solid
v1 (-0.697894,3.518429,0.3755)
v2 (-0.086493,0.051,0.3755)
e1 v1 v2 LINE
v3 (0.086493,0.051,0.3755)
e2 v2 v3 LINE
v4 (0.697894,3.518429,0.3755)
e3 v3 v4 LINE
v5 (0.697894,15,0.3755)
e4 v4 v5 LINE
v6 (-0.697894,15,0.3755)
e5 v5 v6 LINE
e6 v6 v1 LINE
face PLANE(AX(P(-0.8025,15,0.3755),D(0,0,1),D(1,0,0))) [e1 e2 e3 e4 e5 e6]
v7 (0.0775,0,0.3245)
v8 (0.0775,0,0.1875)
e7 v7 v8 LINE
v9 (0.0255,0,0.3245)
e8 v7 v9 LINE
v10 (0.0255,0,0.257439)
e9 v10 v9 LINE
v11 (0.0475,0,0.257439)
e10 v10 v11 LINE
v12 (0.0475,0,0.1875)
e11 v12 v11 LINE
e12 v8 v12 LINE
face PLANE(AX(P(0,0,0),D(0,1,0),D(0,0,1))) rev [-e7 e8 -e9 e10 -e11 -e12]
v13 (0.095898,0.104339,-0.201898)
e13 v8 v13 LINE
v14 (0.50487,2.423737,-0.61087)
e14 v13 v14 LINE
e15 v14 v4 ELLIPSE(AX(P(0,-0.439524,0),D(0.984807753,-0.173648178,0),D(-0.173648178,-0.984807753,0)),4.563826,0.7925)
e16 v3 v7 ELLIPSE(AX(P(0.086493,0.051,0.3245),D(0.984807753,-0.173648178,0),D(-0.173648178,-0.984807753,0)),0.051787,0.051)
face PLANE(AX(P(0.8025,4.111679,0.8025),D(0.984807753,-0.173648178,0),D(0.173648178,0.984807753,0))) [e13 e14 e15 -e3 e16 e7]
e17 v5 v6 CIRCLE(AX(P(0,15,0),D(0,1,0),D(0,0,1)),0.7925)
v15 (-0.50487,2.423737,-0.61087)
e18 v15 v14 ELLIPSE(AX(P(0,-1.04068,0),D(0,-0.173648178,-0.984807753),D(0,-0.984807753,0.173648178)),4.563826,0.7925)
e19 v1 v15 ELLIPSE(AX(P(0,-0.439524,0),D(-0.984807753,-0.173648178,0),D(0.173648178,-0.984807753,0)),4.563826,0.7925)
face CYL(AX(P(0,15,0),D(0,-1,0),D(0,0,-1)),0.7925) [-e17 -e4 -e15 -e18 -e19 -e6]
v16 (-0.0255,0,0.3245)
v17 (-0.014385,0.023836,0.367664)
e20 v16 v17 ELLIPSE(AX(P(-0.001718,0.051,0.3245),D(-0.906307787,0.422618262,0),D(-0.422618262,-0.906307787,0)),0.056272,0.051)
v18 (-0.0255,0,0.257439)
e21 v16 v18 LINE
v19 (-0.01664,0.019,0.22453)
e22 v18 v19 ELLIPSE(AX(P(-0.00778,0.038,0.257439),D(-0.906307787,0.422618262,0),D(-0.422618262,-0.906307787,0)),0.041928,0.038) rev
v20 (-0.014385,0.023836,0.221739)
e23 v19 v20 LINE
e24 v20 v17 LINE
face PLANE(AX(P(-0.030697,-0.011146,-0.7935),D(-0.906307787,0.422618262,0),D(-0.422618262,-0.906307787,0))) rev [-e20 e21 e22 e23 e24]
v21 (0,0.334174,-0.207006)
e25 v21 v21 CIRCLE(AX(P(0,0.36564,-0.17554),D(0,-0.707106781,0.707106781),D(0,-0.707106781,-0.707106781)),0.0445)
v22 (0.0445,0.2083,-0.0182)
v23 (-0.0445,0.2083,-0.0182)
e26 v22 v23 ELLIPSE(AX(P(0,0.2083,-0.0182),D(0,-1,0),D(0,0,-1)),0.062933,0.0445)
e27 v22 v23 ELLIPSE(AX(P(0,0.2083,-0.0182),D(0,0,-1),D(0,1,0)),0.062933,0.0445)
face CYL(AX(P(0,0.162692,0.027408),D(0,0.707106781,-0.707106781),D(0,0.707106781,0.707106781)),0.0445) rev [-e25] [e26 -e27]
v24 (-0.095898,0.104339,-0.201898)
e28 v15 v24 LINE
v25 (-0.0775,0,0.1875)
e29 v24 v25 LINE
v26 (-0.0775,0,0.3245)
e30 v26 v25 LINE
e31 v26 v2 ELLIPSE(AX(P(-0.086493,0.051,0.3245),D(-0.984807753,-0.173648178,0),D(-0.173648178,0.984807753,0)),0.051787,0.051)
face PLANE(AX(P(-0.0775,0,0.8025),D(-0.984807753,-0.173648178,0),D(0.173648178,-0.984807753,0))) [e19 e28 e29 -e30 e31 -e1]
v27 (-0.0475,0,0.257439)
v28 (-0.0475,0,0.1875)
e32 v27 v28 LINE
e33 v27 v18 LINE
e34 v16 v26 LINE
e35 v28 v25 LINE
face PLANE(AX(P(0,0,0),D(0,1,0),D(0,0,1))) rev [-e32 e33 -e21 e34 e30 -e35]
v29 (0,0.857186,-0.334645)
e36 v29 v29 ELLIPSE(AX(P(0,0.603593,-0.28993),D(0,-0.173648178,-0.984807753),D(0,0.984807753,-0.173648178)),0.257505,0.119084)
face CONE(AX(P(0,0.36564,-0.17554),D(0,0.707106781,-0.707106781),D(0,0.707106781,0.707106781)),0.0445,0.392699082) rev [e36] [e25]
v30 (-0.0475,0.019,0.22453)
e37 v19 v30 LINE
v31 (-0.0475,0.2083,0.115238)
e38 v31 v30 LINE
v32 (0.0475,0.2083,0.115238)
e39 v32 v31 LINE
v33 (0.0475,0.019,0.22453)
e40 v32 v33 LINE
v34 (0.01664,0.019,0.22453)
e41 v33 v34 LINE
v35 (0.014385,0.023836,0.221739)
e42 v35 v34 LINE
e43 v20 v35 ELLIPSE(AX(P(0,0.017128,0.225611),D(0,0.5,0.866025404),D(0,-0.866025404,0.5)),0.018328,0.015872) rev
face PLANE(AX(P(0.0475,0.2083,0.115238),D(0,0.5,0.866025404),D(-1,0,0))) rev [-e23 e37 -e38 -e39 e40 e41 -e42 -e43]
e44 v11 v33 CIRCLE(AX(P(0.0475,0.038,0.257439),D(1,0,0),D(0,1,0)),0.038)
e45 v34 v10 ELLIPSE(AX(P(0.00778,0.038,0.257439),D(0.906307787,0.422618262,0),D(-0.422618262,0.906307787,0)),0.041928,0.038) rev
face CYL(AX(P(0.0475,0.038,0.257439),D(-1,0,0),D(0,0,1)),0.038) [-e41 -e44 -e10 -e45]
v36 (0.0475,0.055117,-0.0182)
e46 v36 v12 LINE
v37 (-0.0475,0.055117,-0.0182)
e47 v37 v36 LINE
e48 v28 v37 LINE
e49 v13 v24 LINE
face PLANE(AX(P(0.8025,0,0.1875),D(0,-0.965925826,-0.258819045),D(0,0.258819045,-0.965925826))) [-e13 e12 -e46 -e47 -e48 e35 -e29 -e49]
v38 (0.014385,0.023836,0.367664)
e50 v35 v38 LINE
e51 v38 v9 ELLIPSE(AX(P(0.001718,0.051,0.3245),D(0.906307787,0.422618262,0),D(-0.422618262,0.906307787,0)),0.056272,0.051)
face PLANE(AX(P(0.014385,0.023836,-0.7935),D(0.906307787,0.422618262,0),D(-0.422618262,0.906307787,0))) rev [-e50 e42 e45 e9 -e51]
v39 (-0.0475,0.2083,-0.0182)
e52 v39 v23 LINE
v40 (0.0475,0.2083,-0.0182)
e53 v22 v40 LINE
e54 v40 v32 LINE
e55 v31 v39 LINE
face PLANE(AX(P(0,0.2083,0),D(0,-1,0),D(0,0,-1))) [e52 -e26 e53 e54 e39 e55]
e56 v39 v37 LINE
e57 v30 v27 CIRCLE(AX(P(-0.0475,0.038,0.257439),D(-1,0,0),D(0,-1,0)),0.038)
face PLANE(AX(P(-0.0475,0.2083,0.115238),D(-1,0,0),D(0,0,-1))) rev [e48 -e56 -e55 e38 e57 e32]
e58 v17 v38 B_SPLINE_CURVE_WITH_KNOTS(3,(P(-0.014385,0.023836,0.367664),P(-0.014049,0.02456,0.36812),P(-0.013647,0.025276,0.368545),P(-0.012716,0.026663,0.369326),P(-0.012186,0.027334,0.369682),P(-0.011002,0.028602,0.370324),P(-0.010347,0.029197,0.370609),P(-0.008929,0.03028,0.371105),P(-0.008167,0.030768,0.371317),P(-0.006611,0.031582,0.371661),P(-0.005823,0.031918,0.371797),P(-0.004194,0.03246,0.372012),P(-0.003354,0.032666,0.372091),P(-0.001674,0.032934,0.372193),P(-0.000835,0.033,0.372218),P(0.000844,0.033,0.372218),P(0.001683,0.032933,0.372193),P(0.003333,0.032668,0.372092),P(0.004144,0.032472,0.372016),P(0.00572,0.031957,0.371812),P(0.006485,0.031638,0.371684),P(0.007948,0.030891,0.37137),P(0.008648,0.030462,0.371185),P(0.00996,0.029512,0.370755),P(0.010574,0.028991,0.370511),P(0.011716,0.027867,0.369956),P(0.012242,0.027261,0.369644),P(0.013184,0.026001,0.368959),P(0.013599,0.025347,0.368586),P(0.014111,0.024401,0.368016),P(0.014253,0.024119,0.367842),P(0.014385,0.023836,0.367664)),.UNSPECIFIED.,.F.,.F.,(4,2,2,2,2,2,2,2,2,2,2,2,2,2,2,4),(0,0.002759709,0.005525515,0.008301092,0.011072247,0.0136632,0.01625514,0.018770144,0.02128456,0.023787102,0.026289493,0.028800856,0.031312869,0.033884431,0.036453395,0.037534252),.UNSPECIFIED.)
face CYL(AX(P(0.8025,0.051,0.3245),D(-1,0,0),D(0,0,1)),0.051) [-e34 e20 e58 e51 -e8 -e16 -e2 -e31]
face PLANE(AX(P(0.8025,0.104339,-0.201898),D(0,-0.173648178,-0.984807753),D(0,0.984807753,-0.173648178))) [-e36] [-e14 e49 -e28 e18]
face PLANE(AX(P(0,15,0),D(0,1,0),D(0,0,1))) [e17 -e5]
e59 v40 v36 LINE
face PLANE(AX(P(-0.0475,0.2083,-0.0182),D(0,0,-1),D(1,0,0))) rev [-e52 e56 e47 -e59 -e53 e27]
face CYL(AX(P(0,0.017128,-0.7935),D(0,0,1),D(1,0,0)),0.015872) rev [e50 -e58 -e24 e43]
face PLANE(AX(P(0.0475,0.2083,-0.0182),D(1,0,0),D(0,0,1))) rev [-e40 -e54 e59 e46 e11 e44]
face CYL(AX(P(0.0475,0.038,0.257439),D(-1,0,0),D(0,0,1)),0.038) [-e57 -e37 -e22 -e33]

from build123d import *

# Parameters (mm, degrees)
SKETCH_TL_CUTTING_R        = 0.7925
TL_CUTTING_DEPTH           = 15
SKETCH_TDF_GRINDING_W      = 1.605
SKETCH_TDF_GRINDING_H      = 1.605
TDF_GRINDING_DEPTH         = 16.041812141
ISA_GRINDING_DEPTH         = 0.8025
ISA_GRINDING_DEPTH_BACK    = 0.8025
BA_RA_GRINDING_DEPTH       = 0.8025
BA_RA_GRINDING_DEPTH_BACK  = 0.8025
FRO_ERODING_DEPTH          = 0.8025
FRO_ERODING_DEPTH_BACK     = 0.8025
CAVITY_ERODING_START       = -0.0475
CAVITY_ERODING_DEPTH       = 0.095
SKETCH_HOLE_CAVITY_ENTRY_R = 0.0445
SKETCH_END_CONST_SECTION_R = 0.0445
HOLE_START_FUNNEL_R        = 0.0445
SKETCH_END_FUNNEL_R        = 1.080033906
CUT_EXTRUDE1_REACH         = 17.066
FILLET1_R                  = 0.038


# Read off the part's stored shape, not the designer's step: cavity_eroding
with BuildPart() as part:
    # sketch_TL_cutting → TL_cutting (new body)
    with BuildSketch(Plane(origin=(0, 0, 0), x_dir=(1, 0, 0), z_dir=(0, 1, 0))):
        with Locations(Location((0, 0, 0), (0, 0, 270))):
            Circle(SKETCH_TL_CUTTING_R)
    extrude(amount=TL_CUTTING_DEPTH)

    # sketch_TDF_grinding → TDF_grinding (cut, through all)
    with BuildSketch(Plane(origin=(0, 0, 0), x_dir=(1, 0, 0), z_dir=(0, 1, 0))):
        with Locations((0, -1.178)):
            Rectangle(SKETCH_TDF_GRINDING_W, SKETCH_TDF_GRINDING_H)
    extrude(amount=TDF_GRINDING_DEPTH, mode=Mode.SUBTRACT)

    # sketch_ISA_grinding → ISA_grinding (cut, two sides: drawn at the far end of the back side and taken through both)
    with BuildSketch(Plane.XY.offset(-ISA_GRINDING_DEPTH_BACK)):
        Polygon((-0.0775, 0), (-0.8025, 4.111679319), (-0.8025, -0.01), (0.8025, -0.01), (0.8025, 4.111679319), (0.0775, 0), align=None)
    extrude(amount=ISA_GRINDING_DEPTH + ISA_GRINDING_DEPTH_BACK, mode=Mode.SUBTRACT)

    # sketch_BA_RA_grinding → BA_RA_grinding (cut, two sides: drawn at the far end of the back side and taken through both)
    with BuildSketch(Plane(origin=(0, 0, 0), x_dir=(0, 0, -1), z_dir=(1, 0, 0)).offset(-BA_RA_GRINDING_DEPTH_BACK)):
        Polygon((-0.1875, 0), (-0.3755, 0), (-0.3755, -0.01), (4.01816798, -0.01), (4.01816798, 15.01), (2.83016798, 15.01), (0.201897748, 0.104338812), align=None)
    extrude(amount=BA_RA_GRINDING_DEPTH + BA_RA_GRINDING_DEPTH_BACK, mode=Mode.SUBTRACT)

    # sketch_FRO_eroding → FRO_eroding (cut, two sides: drawn at the far end of the back side and taken through both)
    with BuildSketch(Plane(origin=(0, 0, 0), x_dir=(0, 0, -1), z_dir=(1, 0, 0)).offset(-FRO_ERODING_DEPTH_BACK)):
        with BuildLine():
            Line((-0.3755, 0.051), (-0.3855, 0.051))
            Line((-0.3855, 0.051), (-0.3855, -0.01))
            Line((-0.3855, -0.01), (-0.3245, -0.01))
            Line((-0.3245, -0.01), (-0.3245, 0))
            ThreePointArc((-0.3245, 0), (-0.360562446, 0.014937554), (-0.3755, 0.051))
        make_face()
    extrude(amount=FRO_ERODING_DEPTH + FRO_ERODING_DEPTH_BACK, mode=Mode.SUBTRACT)

    # cavity_eroding outline → cavity_eroding (cut)
    with BuildSketch(Plane.YZ.offset(CAVITY_ERODING_START)):
        Polygon((0, 0.1875), (0.055117149, -0.0182), (0.2083, -0.0182), (0.2083, 0.115237939), (0, 0.2355), align=None)
    extrude(amount=CAVITY_ERODING_DEPTH, mode=Mode.SUBTRACT)

    # sketch_hole_cavity_entry → hole_const_section section 0
    with BuildSketch(Plane(origin=(0, 0.162691609, 0.027408387), x_dir=(-1, 0, 0), z_dir=(0, -0.7071067811865479, 0.7071067811865472))):
        Circle(SKETCH_HOLE_CAVITY_ENTRY_R)
    # sketch_end_const_section → hole_const_section section 1
    with BuildSketch(Plane(origin=(0, 0.365639833, -0.175539837), x_dir=(-1, 0, 0), z_dir=(0, -0.7071067811865479, 0.7071067811865472))):
        Circle(SKETCH_END_CONST_SECTION_R)
    loft(mode=Mode.SUBTRACT)

    # hole_start_funnel → hole_funnel section 0
    with BuildSketch(Plane(origin=(0, 0.365639833, -0.175539837), x_dir=(-1, 0, 0), z_dir=(0, -0.7071067811865479, 0.7071067811865472))):
        Circle(HOLE_START_FUNNEL_R)
    # sketch_end_funnel → hole_funnel section 1
    with BuildSketch(Plane(origin=(0, 2.133406786, -1.94330679), x_dir=(-1, 0, 0), z_dir=(0, -0.7071067811865479, 0.7071067811865472))):
        Circle(SKETCH_END_FUNNEL_R)
    loft(mode=Mode.SUBTRACT)

    # Sketch1 → Cut-Extrude1 (cut, up to next)
    with BuildSketch(Plane.XY.offset(0.3755), mode=Mode.PRIVATE) as cut_extrude1_sk1:
        with BuildLine():
            Line((-0.030697365, -0.011145784), (-0.014385299, 0.023835554))
            ThreePointArc((-0.014385299, 0.023835554), (0, 0.033), (0.014385299, 0.023835554))
            Line((0.014385299, 0.023835554), (0.030697365, -0.011145784))
            Line((0.030697365, -0.011145784), (-0.030697365, -0.011145784))
        make_face()
    cut_extrude1_tool1 = extrude(cut_extrude1_sk1.sketch, amount=-CUT_EXTRUDE1_REACH, mode=Mode.PRIVATE) & part.part
    add(cut_extrude1_tool1.solids().sort_by_distance((0, 0.006741, 0.3755))[0], mode=Mode.SUBTRACT)

    # Fillet1
    fillet1_edges = [part.edges().sort_by_distance(p)[0] for p in [
        (0.0365, 0, 0.2355),
        (-0.0365, 0, 0.2355),
    ]]
    fillet(fillet1_edges, radius=FILLET1_R)


solid = part.part
